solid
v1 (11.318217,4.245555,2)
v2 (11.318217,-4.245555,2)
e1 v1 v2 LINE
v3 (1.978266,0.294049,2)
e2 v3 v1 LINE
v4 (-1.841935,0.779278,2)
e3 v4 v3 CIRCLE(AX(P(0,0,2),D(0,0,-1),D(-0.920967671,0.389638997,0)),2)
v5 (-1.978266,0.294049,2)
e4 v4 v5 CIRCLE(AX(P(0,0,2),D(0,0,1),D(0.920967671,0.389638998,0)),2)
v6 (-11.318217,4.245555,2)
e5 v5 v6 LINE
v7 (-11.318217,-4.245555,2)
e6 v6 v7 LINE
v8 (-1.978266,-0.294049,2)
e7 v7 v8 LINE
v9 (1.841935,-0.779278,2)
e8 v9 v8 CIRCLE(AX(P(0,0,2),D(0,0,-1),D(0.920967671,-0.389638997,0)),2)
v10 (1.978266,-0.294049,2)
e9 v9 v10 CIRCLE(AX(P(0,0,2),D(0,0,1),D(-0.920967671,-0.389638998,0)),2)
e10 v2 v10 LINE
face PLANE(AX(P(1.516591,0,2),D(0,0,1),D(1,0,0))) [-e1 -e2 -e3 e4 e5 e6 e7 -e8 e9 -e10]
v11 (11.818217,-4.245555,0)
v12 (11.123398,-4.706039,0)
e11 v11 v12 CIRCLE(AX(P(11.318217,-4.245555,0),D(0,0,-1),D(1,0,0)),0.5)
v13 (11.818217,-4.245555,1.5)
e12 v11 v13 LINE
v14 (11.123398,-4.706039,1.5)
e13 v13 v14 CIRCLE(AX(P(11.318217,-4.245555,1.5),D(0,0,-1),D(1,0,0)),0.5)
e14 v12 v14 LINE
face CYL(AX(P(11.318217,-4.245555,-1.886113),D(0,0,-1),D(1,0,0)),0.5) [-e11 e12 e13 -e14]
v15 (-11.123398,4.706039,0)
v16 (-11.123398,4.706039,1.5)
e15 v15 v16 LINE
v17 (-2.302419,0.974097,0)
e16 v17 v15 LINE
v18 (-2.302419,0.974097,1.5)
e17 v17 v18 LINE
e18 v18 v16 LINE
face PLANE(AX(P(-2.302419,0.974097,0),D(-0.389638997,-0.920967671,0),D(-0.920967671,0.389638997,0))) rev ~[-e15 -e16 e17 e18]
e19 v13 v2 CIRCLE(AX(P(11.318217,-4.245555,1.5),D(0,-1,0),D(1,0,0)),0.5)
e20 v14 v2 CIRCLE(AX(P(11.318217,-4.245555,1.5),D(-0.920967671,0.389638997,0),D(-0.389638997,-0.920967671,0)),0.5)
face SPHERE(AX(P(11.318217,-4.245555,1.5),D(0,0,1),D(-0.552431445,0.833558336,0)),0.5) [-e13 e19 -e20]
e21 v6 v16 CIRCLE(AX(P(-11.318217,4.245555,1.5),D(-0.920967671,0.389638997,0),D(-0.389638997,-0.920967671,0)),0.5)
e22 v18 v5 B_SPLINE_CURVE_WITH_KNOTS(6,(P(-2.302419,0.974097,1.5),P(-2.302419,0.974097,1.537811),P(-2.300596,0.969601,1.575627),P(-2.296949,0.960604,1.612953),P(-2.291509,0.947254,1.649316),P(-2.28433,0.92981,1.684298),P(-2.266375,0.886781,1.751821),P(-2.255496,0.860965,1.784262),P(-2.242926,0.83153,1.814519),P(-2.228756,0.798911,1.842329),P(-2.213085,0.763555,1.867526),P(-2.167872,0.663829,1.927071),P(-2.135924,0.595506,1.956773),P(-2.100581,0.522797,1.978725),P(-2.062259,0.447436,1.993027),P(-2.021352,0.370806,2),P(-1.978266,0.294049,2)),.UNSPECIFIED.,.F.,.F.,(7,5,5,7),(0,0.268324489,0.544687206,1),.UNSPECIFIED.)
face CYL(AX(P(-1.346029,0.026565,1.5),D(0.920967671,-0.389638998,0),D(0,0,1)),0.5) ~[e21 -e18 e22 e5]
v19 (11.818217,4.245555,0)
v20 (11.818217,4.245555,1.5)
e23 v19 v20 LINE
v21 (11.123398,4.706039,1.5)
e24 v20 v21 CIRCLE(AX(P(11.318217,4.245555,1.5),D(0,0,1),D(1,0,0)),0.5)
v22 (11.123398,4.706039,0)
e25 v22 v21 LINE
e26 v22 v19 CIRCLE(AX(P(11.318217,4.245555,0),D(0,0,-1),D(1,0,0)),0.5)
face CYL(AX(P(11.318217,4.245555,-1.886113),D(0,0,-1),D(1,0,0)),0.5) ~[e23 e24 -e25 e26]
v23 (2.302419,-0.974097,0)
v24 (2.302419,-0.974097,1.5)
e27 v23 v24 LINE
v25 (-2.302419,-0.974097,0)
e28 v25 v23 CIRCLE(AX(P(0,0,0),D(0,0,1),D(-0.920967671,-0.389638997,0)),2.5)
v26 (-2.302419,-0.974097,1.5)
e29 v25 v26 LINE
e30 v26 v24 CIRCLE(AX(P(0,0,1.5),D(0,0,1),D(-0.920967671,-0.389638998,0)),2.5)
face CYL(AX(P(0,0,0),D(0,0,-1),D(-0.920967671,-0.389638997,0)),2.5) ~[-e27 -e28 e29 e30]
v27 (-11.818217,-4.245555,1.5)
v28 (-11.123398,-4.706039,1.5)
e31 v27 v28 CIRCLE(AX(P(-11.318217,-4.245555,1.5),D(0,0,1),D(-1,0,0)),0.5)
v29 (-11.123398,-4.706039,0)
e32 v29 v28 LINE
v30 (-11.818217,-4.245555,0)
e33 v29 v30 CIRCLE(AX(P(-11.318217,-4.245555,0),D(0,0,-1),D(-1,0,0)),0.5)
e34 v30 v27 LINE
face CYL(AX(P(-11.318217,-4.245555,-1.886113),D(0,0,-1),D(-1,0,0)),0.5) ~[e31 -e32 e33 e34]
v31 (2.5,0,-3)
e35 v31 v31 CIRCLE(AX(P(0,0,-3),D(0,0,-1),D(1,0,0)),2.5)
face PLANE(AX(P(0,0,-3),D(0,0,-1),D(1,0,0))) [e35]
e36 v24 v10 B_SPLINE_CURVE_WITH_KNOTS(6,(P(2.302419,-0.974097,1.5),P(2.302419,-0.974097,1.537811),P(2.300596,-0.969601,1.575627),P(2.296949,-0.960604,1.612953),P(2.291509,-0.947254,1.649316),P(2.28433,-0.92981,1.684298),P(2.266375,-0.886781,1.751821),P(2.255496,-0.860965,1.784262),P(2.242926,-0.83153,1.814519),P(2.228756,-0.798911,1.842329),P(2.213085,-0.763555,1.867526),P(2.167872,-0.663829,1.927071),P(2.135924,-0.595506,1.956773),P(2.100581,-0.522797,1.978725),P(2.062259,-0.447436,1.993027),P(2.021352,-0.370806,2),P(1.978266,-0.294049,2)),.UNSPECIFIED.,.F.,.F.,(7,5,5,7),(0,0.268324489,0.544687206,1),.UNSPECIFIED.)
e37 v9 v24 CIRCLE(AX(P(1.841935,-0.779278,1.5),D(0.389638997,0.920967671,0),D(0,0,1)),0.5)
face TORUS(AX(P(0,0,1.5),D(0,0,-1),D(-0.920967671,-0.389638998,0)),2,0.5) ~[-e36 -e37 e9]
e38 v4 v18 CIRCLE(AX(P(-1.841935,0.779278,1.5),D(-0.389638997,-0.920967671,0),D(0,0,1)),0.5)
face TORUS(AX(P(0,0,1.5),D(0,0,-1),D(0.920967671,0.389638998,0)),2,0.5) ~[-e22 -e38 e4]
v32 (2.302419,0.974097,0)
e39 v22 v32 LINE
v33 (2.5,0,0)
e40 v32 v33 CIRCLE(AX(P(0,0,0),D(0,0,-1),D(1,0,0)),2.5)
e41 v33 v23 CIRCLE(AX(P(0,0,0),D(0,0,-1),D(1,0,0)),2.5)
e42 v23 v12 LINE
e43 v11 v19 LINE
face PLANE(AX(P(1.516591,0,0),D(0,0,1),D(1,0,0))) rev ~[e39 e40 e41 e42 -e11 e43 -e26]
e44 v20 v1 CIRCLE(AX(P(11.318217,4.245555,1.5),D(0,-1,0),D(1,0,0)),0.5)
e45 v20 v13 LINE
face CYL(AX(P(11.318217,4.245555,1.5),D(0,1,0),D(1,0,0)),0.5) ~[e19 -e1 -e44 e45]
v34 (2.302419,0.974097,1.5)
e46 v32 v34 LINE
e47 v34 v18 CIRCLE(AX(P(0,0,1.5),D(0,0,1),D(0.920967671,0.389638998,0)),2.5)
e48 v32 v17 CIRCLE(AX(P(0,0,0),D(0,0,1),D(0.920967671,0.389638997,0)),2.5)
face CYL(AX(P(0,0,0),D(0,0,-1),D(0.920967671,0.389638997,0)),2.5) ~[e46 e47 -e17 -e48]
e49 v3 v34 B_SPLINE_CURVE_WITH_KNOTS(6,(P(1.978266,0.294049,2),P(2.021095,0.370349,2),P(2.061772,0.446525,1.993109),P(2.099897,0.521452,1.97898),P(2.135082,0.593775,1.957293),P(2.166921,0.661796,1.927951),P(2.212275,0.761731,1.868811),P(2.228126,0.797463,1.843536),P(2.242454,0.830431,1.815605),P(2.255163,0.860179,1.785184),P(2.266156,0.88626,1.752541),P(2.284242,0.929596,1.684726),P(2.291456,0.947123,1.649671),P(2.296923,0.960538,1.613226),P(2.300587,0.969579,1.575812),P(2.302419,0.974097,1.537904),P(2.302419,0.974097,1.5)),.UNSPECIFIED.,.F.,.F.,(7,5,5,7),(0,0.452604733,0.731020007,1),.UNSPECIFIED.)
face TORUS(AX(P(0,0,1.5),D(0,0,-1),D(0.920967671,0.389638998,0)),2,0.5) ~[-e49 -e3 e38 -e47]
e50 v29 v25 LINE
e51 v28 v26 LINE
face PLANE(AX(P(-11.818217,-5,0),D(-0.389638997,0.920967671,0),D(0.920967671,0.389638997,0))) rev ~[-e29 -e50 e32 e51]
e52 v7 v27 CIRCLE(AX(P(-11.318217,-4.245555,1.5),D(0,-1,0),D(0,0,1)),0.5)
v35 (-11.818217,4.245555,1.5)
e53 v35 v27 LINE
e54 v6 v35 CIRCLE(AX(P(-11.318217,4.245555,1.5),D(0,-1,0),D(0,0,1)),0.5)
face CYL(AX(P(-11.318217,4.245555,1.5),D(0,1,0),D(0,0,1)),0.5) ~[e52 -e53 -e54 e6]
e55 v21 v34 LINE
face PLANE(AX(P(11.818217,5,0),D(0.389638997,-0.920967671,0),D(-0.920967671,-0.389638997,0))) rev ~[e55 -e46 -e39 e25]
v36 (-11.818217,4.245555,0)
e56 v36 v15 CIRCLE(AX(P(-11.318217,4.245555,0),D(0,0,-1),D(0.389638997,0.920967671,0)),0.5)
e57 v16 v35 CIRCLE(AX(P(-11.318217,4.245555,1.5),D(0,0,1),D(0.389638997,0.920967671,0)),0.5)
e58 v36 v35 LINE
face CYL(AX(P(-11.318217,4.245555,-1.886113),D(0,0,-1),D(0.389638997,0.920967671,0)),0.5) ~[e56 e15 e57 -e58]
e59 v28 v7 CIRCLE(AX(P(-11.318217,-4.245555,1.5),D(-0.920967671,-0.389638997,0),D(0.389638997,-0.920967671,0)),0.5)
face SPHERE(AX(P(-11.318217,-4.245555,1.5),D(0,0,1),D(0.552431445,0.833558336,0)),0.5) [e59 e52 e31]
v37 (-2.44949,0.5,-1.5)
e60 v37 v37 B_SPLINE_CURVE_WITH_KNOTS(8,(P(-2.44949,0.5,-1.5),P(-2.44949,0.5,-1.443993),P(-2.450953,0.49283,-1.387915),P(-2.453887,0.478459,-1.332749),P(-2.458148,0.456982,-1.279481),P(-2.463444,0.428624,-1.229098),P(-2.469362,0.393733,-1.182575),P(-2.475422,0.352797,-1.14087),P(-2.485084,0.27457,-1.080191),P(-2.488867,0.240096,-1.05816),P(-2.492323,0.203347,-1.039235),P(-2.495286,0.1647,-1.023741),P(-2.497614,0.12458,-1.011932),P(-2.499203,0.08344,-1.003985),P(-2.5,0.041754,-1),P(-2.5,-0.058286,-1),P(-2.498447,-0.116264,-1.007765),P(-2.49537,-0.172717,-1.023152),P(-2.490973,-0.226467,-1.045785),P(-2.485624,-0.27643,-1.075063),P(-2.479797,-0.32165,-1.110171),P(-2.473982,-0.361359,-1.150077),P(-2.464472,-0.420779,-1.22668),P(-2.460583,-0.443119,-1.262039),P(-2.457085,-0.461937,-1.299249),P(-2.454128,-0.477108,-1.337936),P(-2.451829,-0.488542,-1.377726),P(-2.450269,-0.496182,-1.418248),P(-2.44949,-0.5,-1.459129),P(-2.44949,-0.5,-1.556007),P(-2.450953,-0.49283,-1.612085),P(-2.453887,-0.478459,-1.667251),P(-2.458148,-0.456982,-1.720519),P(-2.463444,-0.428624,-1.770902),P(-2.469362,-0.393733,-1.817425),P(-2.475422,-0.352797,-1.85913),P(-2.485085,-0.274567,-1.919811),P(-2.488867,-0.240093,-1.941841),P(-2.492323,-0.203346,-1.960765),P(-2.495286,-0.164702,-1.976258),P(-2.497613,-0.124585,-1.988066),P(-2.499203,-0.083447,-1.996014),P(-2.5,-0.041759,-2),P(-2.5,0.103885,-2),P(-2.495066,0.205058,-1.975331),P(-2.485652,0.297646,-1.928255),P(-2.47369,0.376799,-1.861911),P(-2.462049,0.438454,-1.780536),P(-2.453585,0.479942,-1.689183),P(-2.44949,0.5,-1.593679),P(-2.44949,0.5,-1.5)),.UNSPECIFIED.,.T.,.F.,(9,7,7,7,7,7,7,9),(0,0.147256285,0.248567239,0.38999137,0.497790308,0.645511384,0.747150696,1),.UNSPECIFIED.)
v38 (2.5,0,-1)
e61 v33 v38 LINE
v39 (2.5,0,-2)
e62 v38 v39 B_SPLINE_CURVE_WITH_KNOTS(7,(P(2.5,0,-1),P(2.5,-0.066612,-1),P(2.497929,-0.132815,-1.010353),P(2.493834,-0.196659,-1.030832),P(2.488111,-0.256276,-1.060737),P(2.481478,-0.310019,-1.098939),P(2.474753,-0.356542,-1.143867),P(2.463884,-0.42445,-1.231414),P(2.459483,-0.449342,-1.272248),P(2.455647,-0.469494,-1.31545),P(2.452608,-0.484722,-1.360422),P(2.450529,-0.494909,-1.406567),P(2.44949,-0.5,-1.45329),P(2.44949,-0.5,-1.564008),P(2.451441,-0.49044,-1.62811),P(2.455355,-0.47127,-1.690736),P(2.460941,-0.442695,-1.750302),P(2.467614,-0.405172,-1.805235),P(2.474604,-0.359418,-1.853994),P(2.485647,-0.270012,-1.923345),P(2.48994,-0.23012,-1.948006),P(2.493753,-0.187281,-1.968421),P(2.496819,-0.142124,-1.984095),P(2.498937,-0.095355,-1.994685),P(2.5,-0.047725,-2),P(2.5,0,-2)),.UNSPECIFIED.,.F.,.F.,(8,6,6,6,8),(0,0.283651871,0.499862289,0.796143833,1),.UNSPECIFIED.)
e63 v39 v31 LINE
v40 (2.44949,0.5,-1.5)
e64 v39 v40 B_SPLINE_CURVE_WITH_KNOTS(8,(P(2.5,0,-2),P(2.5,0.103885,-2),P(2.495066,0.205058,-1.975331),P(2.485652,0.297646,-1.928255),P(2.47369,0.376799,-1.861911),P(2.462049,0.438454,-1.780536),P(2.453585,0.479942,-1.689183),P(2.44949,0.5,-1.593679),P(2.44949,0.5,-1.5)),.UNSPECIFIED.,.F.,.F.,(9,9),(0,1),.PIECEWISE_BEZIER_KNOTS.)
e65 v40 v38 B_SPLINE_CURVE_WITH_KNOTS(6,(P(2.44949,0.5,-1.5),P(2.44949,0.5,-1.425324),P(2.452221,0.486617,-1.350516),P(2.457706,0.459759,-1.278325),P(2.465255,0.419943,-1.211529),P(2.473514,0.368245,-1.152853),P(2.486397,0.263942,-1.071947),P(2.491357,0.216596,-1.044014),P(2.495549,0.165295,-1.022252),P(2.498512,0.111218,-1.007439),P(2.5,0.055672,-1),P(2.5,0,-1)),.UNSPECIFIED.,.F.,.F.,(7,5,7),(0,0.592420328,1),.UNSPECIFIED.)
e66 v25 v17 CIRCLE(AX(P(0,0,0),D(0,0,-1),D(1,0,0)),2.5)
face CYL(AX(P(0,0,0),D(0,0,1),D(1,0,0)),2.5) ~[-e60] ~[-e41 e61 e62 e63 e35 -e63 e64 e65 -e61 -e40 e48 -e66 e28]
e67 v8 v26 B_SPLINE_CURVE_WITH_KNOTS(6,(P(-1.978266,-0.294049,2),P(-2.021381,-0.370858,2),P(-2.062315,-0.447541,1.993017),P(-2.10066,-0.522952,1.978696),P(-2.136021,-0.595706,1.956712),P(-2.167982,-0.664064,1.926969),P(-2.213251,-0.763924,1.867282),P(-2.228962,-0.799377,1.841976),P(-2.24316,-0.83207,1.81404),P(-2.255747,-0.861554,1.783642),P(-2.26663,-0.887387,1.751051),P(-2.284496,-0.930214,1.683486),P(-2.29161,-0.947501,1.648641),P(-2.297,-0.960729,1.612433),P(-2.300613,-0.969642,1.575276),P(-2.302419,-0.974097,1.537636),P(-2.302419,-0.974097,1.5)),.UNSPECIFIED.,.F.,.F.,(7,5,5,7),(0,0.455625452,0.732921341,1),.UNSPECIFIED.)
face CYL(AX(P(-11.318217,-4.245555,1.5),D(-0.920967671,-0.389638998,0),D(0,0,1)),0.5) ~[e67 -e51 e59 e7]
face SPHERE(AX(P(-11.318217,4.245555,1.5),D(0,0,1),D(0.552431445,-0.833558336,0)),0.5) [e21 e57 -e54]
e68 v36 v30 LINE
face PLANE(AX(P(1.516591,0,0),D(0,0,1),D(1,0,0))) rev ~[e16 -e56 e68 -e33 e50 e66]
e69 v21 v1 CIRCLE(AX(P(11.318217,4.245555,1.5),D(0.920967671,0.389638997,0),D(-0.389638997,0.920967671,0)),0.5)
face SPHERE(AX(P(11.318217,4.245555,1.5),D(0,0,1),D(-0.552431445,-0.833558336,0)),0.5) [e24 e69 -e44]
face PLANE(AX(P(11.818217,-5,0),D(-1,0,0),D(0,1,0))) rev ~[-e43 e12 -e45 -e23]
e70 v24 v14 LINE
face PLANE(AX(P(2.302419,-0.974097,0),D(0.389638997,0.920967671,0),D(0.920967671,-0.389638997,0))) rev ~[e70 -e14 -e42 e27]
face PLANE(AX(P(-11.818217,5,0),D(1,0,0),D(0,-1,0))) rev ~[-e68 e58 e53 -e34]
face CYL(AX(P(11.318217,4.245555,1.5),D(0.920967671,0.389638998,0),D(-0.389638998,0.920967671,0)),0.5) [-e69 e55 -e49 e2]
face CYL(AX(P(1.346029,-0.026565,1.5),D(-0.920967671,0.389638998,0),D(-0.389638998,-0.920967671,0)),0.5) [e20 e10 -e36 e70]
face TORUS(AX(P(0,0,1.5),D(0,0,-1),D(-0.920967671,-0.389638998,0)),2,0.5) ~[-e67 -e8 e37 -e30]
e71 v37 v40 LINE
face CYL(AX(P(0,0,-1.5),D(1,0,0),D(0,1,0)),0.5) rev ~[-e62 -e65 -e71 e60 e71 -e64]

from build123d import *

# Parameters (mm, degrees)
F1_DEPTH      = 2
F2_R          = 2.5
F3_DEPTH      = 3
F4_R          = 0.5
F5_DEPTH      = 12.5
F6_T1_DEPTH   = 3.3861126193
F6_T3_DEPTH   = 8.4911099046
F6_T8_DEPTH   = 0.5
F6_T14_DEPTH  = 0.5
F6_T20_DEPTH  = 0.5
F6_T26_DEPTH  = 0.5
F6_T32_DEPTH  = 10.8279460436
F6_S33_R      = 2.5
F6_T34_DEPTH  = 7
F6_T36_ANGLE  = 134.1359227244
F6_T40_DEPTH  = 10.8279460436
F6_S41_R      = 2.5
F6_T42_DEPTH  = 7
F6_T46_DEPTH  = 10.8279460436
F6_S47_R      = 2.5
F6_T48_DEPTH  = 7
F6_T50_ANGLE  = 134.1359227244
F6_T54_DEPTH  = 10.8279460436
F6_S55_R      = 2.5
F6_T56_DEPTH  = 7
F6_T61_DEPTH  = 10.8279460436
F6_S62_R      = 2.5
F6_T63_DEPTH  = 7
F6_T66_ANGLE  = 162.8093840648
F6_T73_ANGLE  = 162.8093840648
F6_T77_DEPTH  = 10.8279460436
F6_S78_R      = 2.5
F6_T79_DEPTH  = 7
F6_T85_DEPTH  = 10.8279460436
F6_S86_R      = 2.5
F6_T87_DEPTH  = 7
F6_T90_ANGLE  = 162.8093840648
F6_T97_DEPTH  = 10.8279460436
F6_S98_R      = 2.5
F6_T99_DEPTH  = 7
F6_T102_ANGLE = 162.8093840648


# Not quite as in the source:
# - a fillet or chamfer that OpenCascade refuses, or shapes differently, is made with other operations: its cross-section is extruded or revolved along the edge and cut away or added


with BuildPart() as f1:
    # F0 (on Top) → F1 (new body)
    with BuildSketch(Plane.XY):
        with BuildLine():
            ThreePointArc((2.3024191783, -0.9740974937), (2.4501069309, -0.4969668269), (2.5, 0))
            ThreePointArc((2.5, 0), (2.4501069309, 0.4969668269), (2.3024191783, 0.9740974937))
            Line((2.3024191783, 0.9740974937), (0, 0))
            Line((0, 0), (2.3024191783, -0.9740974937))
        make_face()
        with BuildLine():
            ThreePointArc((2.3024191783, 0.9740974937), (2.4501069309, 0.4969668269), (2.5, 0))
            ThreePointArc((2.5, 0), (2.4501069309, -0.4969668269), (2.3024191783, -0.9740974937))
            Line((2.3024191783, -0.9740974937), (11.8182173411, -5))
            Line((11.8182173411, -5), (11.8182173411, 5))
            Line((11.8182173411, 5), (2.3024191783, 0.9740974937))
        make_face()
        with BuildLine():
            Line((0, 0), (2.3024191783, 0.9740974937))
            ThreePointArc((2.3024191783, 0.9740974937), (0, 2.5), (-2.3024191783, 0.9740974937))
            Line((-2.3024191783, 0.9740974937), (0, 0))
        make_face()
        with BuildLine():
            ThreePointArc((-2.3024191783, -0.9740974937), (0, -2.5), (2.3024191783, -0.9740974937))
            Line((2.3024191783, -0.9740974937), (0, 0))
            Line((0, 0), (-2.3024191783, -0.9740974937))
        make_face()
        with BuildLine():
            Line((0, 0), (-2.3024191783, 0.9740974937))
            ThreePointArc((-2.3024191783, 0.9740974937), (-2.5, 0), (-2.3024191783, -0.9740974937))
            Line((-2.3024191783, -0.9740974937), (0, 0))
        make_face()
        with BuildLine():
            ThreePointArc((-2.3024191783, -0.9740974937), (-2.5, 0), (-2.3024191783, 0.9740974937))
            Line((-2.3024191783, 0.9740974937), (-11.8182173411, 5))
            Line((-11.8182173411, 5), (-11.8182173411, -5))
            Line((-11.8182173411, -5), (-2.3024191783, -0.9740974937))
        make_face()
    extrude(amount=F1_DEPTH)

    # F2 (on face) → F3 (join)
    with BuildSketch(Plane(origin=(0, 0, 0), x_dir=(1, 0, 0), z_dir=(0, 0, -1))):
        Circle(F2_R)
    extrude(amount=F3_DEPTH)

    # F4 (on Right) → F5 (cut, symmetric)
    with BuildSketch(Plane.YZ):
        with Locations((0, -1.5)):
            Circle(F4_R)
    extrude(amount=F5_DEPTH, both=True, mode=Mode.SUBTRACT)

    # F6: fillet of radius 0.5 on 12 edges, made by hand

    # F6_s2 → F6_t1 (cut)
    with BuildSketch(Plane.XY.offset(-1.8861126193)):
        with BuildLine():
            ThreePointArc((-11.8182173411, -4.2455549523), (-11.5944330635, -4.6623341201), (-11.1233978424, -4.706038788))
            Line((-11.1233978424, -4.706038788), (-11.8182173411, -5))
            Line((-11.8182173411, -5), (-11.8182173411, -4.2455549523))
        make_face()
        with BuildLine():
            ThreePointArc((11.8182173411, 4.2455549523), (11.5944330635, 4.6623341201), (11.1233978424, 4.706038788))
            Line((11.1233978424, 4.706038788), (11.8182173411, 5))
            Line((11.8182173411, 5), (11.8182173411, 4.2455549523))
        make_face()
        with BuildLine():
            ThreePointArc((11.8182173411, -4.2455549523), (11.5944330635, -4.6623341201), (11.1233978424, -4.706038788))
            Line((11.1233978424, -4.706038788), (11.8182173411, -5))
            Line((11.8182173411, -5), (11.8182173411, -4.2455549523))
        make_face()
        with BuildLine():
            ThreePointArc((-11.1233978424, 4.706038788), (-11.5944330635, 4.6623341201), (-11.8182173411, 4.2455549523))
            Line((-11.8182173411, 4.2455549523), (-11.8182173411, 5))
            Line((-11.8182173411, 5), (-11.1233978424, 4.706038788))
        make_face()
    extrude(amount=F6_T1_DEPTH, mode=Mode.SUBTRACT)

    # F6_s4 → F6_t3 (cut)
    with BuildSketch(Plane.XZ.offset(-4.2455549523)):
        with BuildLine():
            ThreePointArc((11.8182173411, 1.5), (11.6717707317, 1.8535533906), (11.3182173411, 2))
            Line((11.3182173411, 2), (11.8182173411, 2))
            Line((11.8182173411, 2), (11.8182173411, 1.5))
        make_face()
        with BuildLine():
            ThreePointArc((-11.3182173411, 2), (-11.6717707317, 1.8535533906), (-11.8182173411, 1.5))
            Line((-11.8182173411, 1.5), (-11.8182173411, 2))
            Line((-11.8182173411, 2), (-11.3182173411, 2))
        make_face()
    extrude(amount=F6_T3_DEPTH, mode=Mode.SUBTRACT)


with BuildPart() as f6_tool6:
    # F6_s7 → F6_t8 (new body)
    with BuildSketch(Plane.XY.offset(1.5)):
        Polygon((-11.3182173411, -4.2455549523), (-11.8182173411, -4.2455549523), (-11.8182173411, -5), (-11.1233978424, -4.706038788), align=None)
    extrude(amount=F6_T8_DEPTH)

    # F6_s9 → F6_t10 (revolve, cut)
    with BuildSketch(Plane(origin=(-11.3182173411, -4.2455549523, 1.5), x_dir=(0.5524314449, 0.8335583355, 0), z_dir=(0.8335583355, -0.5524314449, 0))):
        with BuildLine():
            ThreePointArc((0, -0.5), (0.5, 0), (0, 0.5))
            Line((0, 0.5), (0, -0.5))
        make_face()
    revolve(axis=Axis((-11.3182173411, -4.2455549523, 1.5), (0, 0, 1)), mode=Mode.SUBTRACT)


with BuildPart() as f1_1:
    add(f1.part)

    # F6_t5: cut F6_tool6
    add(f6_tool6.part, mode=Mode.SUBTRACT)


with BuildPart() as f6_tool12:
    # F6_s13 → F6_t14 (new body)
    with BuildSketch(Plane.XY.offset(1.5)):
        Polygon((11.3182173411, 4.2455549523), (11.8182173411, 4.2455549523), (11.8182173411, 5), (11.1233978424, 4.706038788), align=None)
    extrude(amount=F6_T14_DEPTH)

    # F6_s15 → F6_t16 (revolve, cut)
    with BuildSketch(Plane(origin=(11.3182173411, 4.2455549523, 1.5), x_dir=(-0.5524314449, -0.8335583355, 0), z_dir=(-0.8335583355, 0.5524314449, 0))):
        with BuildLine():
            ThreePointArc((0, -0.5), (0.5, 0), (0, 0.5))
            Line((0, 0.5), (0, -0.5))
        make_face()
    revolve(axis=Axis((11.3182173411, 4.2455549523, 1.5), (0, 0, 1)), mode=Mode.SUBTRACT)


with BuildPart() as f1_2:
    add(f1_1.part)

    # F6_t11: cut F6_tool12
    add(f6_tool12.part, mode=Mode.SUBTRACT)


with BuildPart() as f6_tool18:
    # F6_s19 → F6_t20 (new body)
    with BuildSketch(Plane.XY.offset(1.5)):
        Polygon((11.3182173411, -4.2455549523), (11.8182173411, -4.2455549523), (11.8182173411, -5), (11.1233978424, -4.706038788), align=None)
    extrude(amount=F6_T20_DEPTH)

    # F6_s21 → F6_t22 (revolve, cut)
    with BuildSketch(Plane(origin=(11.3182173411, -4.2455549523, 1.5), x_dir=(-0.5524314449, 0.8335583355, 0), z_dir=(0.8335583355, 0.5524314449, 0))):
        with BuildLine():
            ThreePointArc((0, -0.5), (0.5, 0), (0, 0.5))
            Line((0, 0.5), (0, -0.5))
        make_face()
    revolve(axis=Axis((11.3182173411, -4.2455549523, 1.5), (0, 0, 1)), mode=Mode.SUBTRACT)


with BuildPart() as f1_3:
    add(f1_2.part)

    # F6_t17: cut F6_tool18
    add(f6_tool18.part, mode=Mode.SUBTRACT)


with BuildPart() as f6_tool24:
    # F6_s25 → F6_t26 (new body)
    with BuildSketch(Plane.XY.offset(1.5)):
        Polygon((-11.3182173411, 4.2455549523), (-11.1233978424, 4.706038788), (-11.8182173411, 5), (-11.8182173411, 4.2455549523), align=None)
    extrude(amount=F6_T26_DEPTH)

    # F6_s27 → F6_t28 (revolve, cut)
    with BuildSketch(Plane(origin=(-11.3182173411, 4.2455549523, 1.5), x_dir=(0.5524314449, -0.8335583355, 0), z_dir=(-0.8335583355, -0.5524314449, 0))):
        with BuildLine():
            ThreePointArc((0, -0.5), (0.5, 0), (0, 0.5))
            Line((0, 0.5), (0, -0.5))
        make_face()
    revolve(axis=Axis((-11.3182173411, 4.2455549523, 1.5), (0, 0, 1)), mode=Mode.SUBTRACT)


with BuildPart() as f1_4:
    add(f1_3.part)

    # F6_t23: cut F6_tool24
    add(f6_tool24.part, mode=Mode.SUBTRACT)


with BuildPart() as f6_tool30:
    # F6_s31 → F6_t32 (new body)
    with BuildSketch(Plane(origin=(11.1233978424, 4.706038788, 0), x_dir=(0, 0, 1), z_dir=(-0.9209676713, -0.3896389975, 0))):
        with BuildLine():
            ThreePointArc((1.5, 0), (1.8535533906, -0.1464466094), (2, -0.5))
            Line((2, -0.5), (2, 0))
            Line((2, 0), (1.5, 0))
        make_face()
    extrude(amount=F6_T32_DEPTH)

    # F6_s33 → F6_t34 (cut, symmetric)
    with BuildSketch(Plane.XY.offset(1.8)):
        Circle(F6_S33_R)
    extrude(amount=F6_T34_DEPTH, both=True, mode=Mode.SUBTRACT)


with BuildPart() as f1_5:
    add(f1_4.part)

    # F6_t29: cut F6_tool30
    add(f6_tool30.part, mode=Mode.SUBTRACT)

    # F6_s35 → F6_t36 (revolve, cut)
    with BuildSketch(Plane(origin=(0, 0, 0), x_dir=(0, 0, 1), z_dir=(0.3896389975, -0.9209676713, 0))):
        with BuildLine():
            ThreePointArc((2, -2), (1.8535533906, -2.3535533906), (1.5, -2.5))
            Line((1.5, -2.5), (2, -2.5))
            Line((2, -2.5), (2, -2))
        make_face()
    revolve(axis=Axis((0, 0, 2), (0, 0, 1)), revolution_arc=F6_T36_ANGLE, mode=Mode.SUBTRACT)


with BuildPart() as f6_tool38:
    # F6_s39 → F6_t40 (new body)
    with BuildSketch(Plane(origin=(-1.1512095892, 0.4870487468, 0), x_dir=(0, 0, 1), z_dir=(-0.9209676713, 0.3896389975, 0))):
        with BuildLine():
            ThreePointArc((2, -0.5), (1.8535533906, -0.1464466094), (1.5, 0))
            Line((1.5, 0), (2, 0))
            Line((2, 0), (2, -0.5))
        make_face()
    extrude(amount=F6_T40_DEPTH)

    # F6_s41 → F6_t42 (cut, symmetric)
    with BuildSketch(Plane.XY.offset(1.8)):
        Circle(F6_S41_R)
    extrude(amount=F6_T42_DEPTH, both=True, mode=Mode.SUBTRACT)


with BuildPart() as f1_6:
    add(f1_5.part)

    # F6_t37: cut F6_tool38
    add(f6_tool38.part, mode=Mode.SUBTRACT)


with BuildPart() as f6_tool44:
    # F6_s45 → F6_t46 (new body)
    with BuildSketch(Plane(origin=(-11.1233978424, -4.706038788, 0), x_dir=(0, 0, 1), z_dir=(0.9209676713, 0.3896389975, 0))):
        with BuildLine():
            ThreePointArc((2, -0.5), (1.8535533906, -0.1464466094), (1.5, 0))
            Line((1.5, 0), (2, 0))
            Line((2, 0), (2, -0.5))
        make_face()
    extrude(amount=F6_T46_DEPTH)

    # F6_s47 → F6_t48 (cut, symmetric)
    with BuildSketch(Plane.XY.offset(1.7)):
        Circle(F6_S47_R)
    extrude(amount=F6_T48_DEPTH, both=True, mode=Mode.SUBTRACT)


with BuildPart() as f1_7:
    add(f1_6.part)

    # F6_t43: cut F6_tool44
    add(f6_tool44.part, mode=Mode.SUBTRACT)

    # F6_s49 → F6_t50 (revolve, cut)
    with BuildSketch(Plane(origin=(0, 0, 0), x_dir=(0, 0, 1), z_dir=(-0.3896389975, 0.9209676713, 0))):
        with BuildLine():
            ThreePointArc((2, -2), (1.8535533906, -2.3535533906), (1.5, -2.5))
            Line((1.5, -2.5), (2, -2.5))
            Line((2, -2.5), (2, -2))
        make_face()
    revolve(axis=Axis((0, 0, 2), (0, 0, 1)), revolution_arc=F6_T50_ANGLE, mode=Mode.SUBTRACT)


with BuildPart() as f6_tool52:
    # F6_s53 → F6_t54 (new body)
    with BuildSketch(Plane(origin=(1.1512095892, -0.4870487468, 0), x_dir=(0, 0, 1), z_dir=(0.9209676713, -0.3896389975, 0))):
        with BuildLine():
            ThreePointArc((1.5, 0), (1.8535533906, -0.1464466094), (2, -0.5))
            Line((2, -0.5), (2, 0))
            Line((2, 0), (1.5, 0))
        make_face()
    extrude(amount=F6_T54_DEPTH)

    # F6_s55 → F6_t56 (cut, symmetric)
    with BuildSketch(Plane.XY.offset(1.8)):
        Circle(F6_S55_R)
    extrude(amount=F6_T56_DEPTH, both=True, mode=Mode.SUBTRACT)


with BuildPart() as f1_8:
    add(f1_7.part)

    # F6_t51: cut F6_tool52
    add(f6_tool52.part, mode=Mode.SUBTRACT)


with BuildPart() as f6_tool59:
    # F6_s60 → F6_t61 (new body)
    with BuildSketch(Plane(origin=(11.1233978424, 4.706038788, 0), x_dir=(0, 0, 1), z_dir=(-0.9209676713, -0.3896389975, 0))):
        with BuildLine():
            ThreePointArc((1.5, 0), (1.8535533906, -0.1464466094), (2, -0.5))
            Line((2, -0.5), (2, 0))
            Line((2, 0), (1.5, 0))
        make_face()
    extrude(amount=F6_T61_DEPTH)

    # F6_s62 → F6_t63 (intersect, symmetric)
    with BuildSketch(Plane.XY.offset(1.8)):
        Circle(F6_S62_R)
    extrude(amount=F6_T63_DEPTH, both=True, mode=Mode.INTERSECT)


with BuildPart() as f6_tool64:
    # F6_s65 → F6_t66 (revolve)
    with BuildSketch(Plane(origin=(0, 0, 0), x_dir=(0, 0, 1), z_dir=(-0.1000391116, -0.9949835055, 0))):
        with BuildLine():
            ThreePointArc((2, -2), (1.8535533906, -2.3535533906), (1.5, -2.5))
            Line((1.5, -2.5), (2, -2.5))
            Line((2, -2.5), (2, -2))
        make_face()
    revolve(axis=Axis((0, 0, 2), (0, 0, 1)), revolution_arc=F6_T66_ANGLE)

    split(bisect_by=Plane(origin=(0, 0, 0), x_dir=(0, 0, 1), z_dir=(0.3896389975, -0.9209676713, 0)), keep=Keep.TOP)


with BuildPart() as f6_tool59_1:
    add(f6_tool59.part)

    # F6_t68: intersect F6_tool64
    add(f6_tool64.part, mode=Mode.INTERSECT)


with BuildPart() as f1_9:
    add(f1_8.part)

    # F6_t57: cut F6_tool59
    add(f6_tool59_1.part, mode=Mode.SUBTRACT)


with BuildPart() as f6_tool71:
    # F6_s72 → F6_t73 (revolve)
    with BuildSketch(Plane(origin=(0, 0, 0), x_dir=(0, 0, 1), z_dir=(0.3896389975, -0.9209676713, 0))):
        with BuildLine():
            ThreePointArc((2, -2), (1.8535533906, -2.3535533906), (1.5, -2.5))
            Line((1.5, -2.5), (2, -2.5))
            Line((2, -2.5), (2, -2))
        make_face()
    revolve(axis=Axis((0, 0, 2), (0, 0, 1)), revolution_arc=F6_T73_ANGLE)

    split(bisect_by=Plane(origin=(0, 0, 0), x_dir=(0, 0, 1), z_dir=(-0.3896389975, -0.9209676713, 0)), keep=Keep.TOP)


with BuildPart() as f6_tool75:
    # F6_s76 → F6_t77 (new body)
    with BuildSketch(Plane(origin=(-1.1512095892, 0.4870487468, 0), x_dir=(0, 0, 1), z_dir=(-0.9209676713, 0.3896389975, 0))):
        with BuildLine():
            ThreePointArc((2, -0.5), (1.8535533906, -0.1464466094), (1.5, 0))
            Line((1.5, 0), (2, 0))
            Line((2, 0), (2, -0.5))
        make_face()
    extrude(amount=F6_T77_DEPTH)

    # F6_s78 → F6_t79 (intersect, symmetric)
    with BuildSketch(Plane.XY.offset(1.8)):
        Circle(F6_S78_R)
    extrude(amount=F6_T79_DEPTH, both=True, mode=Mode.INTERSECT)


with BuildPart() as f6_tool71_1:
    add(f6_tool71.part)

    # F6_t80: intersect F6_tool75
    add(f6_tool75.part, mode=Mode.INTERSECT)


with BuildPart() as f1_10:
    add(f1_9.part)

    # F6_t69: cut F6_tool71
    add(f6_tool71_1.part, mode=Mode.SUBTRACT)


with BuildPart() as f6_tool83:
    # F6_s84 → F6_t85 (new body)
    with BuildSketch(Plane(origin=(-11.1233978424, -4.706038788, 0), x_dir=(0, 0, 1), z_dir=(0.9209676713, 0.3896389975, 0))):
        with BuildLine():
            ThreePointArc((2, -0.5), (1.8535533906, -0.1464466094), (1.5, 0))
            Line((1.5, 0), (2, 0))
            Line((2, 0), (2, -0.5))
        make_face()
    extrude(amount=F6_T85_DEPTH)

    # F6_s86 → F6_t87 (intersect, symmetric)
    with BuildSketch(Plane.XY.offset(1.7)):
        Circle(F6_S86_R)
    extrude(amount=F6_T87_DEPTH, both=True, mode=Mode.INTERSECT)


with BuildPart() as f6_tool88:
    # F6_s89 → F6_t90 (revolve)
    with BuildSketch(Plane(origin=(0, 0, 0), x_dir=(0, 0, 1), z_dir=(0.1000391116, 0.9949835055, 0))):
        with BuildLine():
            ThreePointArc((2, -2), (1.8535533906, -2.3535533906), (1.5, -2.5))
            Line((1.5, -2.5), (2, -2.5))
            Line((2, -2.5), (2, -2))
        make_face()
    revolve(axis=Axis((0, 0, 2), (0, 0, 1)), revolution_arc=F6_T90_ANGLE)

    split(bisect_by=Plane(origin=(0, 0, 0), x_dir=(0, 0, 1), z_dir=(-0.3896389975, 0.9209676713, 0)), keep=Keep.TOP)


with BuildPart() as f6_tool83_1:
    add(f6_tool83.part)

    # F6_t92: intersect F6_tool88
    add(f6_tool88.part, mode=Mode.INTERSECT)


with BuildPart() as f1_11:
    add(f1_10.part)

    # F6_t81: cut F6_tool83
    add(f6_tool83_1.part, mode=Mode.SUBTRACT)


with BuildPart() as f6_tool95:
    # F6_s96 → F6_t97 (new body)
    with BuildSketch(Plane(origin=(1.1512095892, -0.4870487468, 0), x_dir=(0, 0, 1), z_dir=(0.9209676713, -0.3896389975, 0))):
        with BuildLine():
            ThreePointArc((1.5, 0), (1.8535533906, -0.1464466094), (2, -0.5))
            Line((2, -0.5), (2, 0))
            Line((2, 0), (1.5, 0))
        make_face()
    extrude(amount=F6_T97_DEPTH)

    # F6_s98 → F6_t99 (intersect, symmetric)
    with BuildSketch(Plane.XY.offset(1.8)):
        Circle(F6_S98_R)
    extrude(amount=F6_T99_DEPTH, both=True, mode=Mode.INTERSECT)


with BuildPart() as f6_tool100:
    # F6_s101 → F6_t102 (revolve)
    with BuildSketch(Plane(origin=(0, 0, 0), x_dir=(0, 0, 1), z_dir=(-0.3896389975, 0.9209676713, 0))):
        with BuildLine():
            ThreePointArc((2, -2), (1.8535533906, -2.3535533906), (1.5, -2.5))
            Line((1.5, -2.5), (2, -2.5))
            Line((2, -2.5), (2, -2))
        make_face()
    revolve(axis=Axis((0, 0, 2), (0, 0, 1)), revolution_arc=F6_T102_ANGLE)

    split(bisect_by=Plane(origin=(0, 0, 0), x_dir=(0, 0, 1), z_dir=(0.3896389975, 0.9209676713, 0)), keep=Keep.TOP)


with BuildPart() as f6_tool95_1:
    add(f6_tool95.part)

    # F6_t104: intersect F6_tool100
    add(f6_tool100.part, mode=Mode.INTERSECT)


with BuildPart() as f1_12:
    add(f1_11.part)

    # F6_t93: cut F6_tool95
    add(f6_tool95_1.part, mode=Mode.SUBTRACT)


solid = f1_12.part
